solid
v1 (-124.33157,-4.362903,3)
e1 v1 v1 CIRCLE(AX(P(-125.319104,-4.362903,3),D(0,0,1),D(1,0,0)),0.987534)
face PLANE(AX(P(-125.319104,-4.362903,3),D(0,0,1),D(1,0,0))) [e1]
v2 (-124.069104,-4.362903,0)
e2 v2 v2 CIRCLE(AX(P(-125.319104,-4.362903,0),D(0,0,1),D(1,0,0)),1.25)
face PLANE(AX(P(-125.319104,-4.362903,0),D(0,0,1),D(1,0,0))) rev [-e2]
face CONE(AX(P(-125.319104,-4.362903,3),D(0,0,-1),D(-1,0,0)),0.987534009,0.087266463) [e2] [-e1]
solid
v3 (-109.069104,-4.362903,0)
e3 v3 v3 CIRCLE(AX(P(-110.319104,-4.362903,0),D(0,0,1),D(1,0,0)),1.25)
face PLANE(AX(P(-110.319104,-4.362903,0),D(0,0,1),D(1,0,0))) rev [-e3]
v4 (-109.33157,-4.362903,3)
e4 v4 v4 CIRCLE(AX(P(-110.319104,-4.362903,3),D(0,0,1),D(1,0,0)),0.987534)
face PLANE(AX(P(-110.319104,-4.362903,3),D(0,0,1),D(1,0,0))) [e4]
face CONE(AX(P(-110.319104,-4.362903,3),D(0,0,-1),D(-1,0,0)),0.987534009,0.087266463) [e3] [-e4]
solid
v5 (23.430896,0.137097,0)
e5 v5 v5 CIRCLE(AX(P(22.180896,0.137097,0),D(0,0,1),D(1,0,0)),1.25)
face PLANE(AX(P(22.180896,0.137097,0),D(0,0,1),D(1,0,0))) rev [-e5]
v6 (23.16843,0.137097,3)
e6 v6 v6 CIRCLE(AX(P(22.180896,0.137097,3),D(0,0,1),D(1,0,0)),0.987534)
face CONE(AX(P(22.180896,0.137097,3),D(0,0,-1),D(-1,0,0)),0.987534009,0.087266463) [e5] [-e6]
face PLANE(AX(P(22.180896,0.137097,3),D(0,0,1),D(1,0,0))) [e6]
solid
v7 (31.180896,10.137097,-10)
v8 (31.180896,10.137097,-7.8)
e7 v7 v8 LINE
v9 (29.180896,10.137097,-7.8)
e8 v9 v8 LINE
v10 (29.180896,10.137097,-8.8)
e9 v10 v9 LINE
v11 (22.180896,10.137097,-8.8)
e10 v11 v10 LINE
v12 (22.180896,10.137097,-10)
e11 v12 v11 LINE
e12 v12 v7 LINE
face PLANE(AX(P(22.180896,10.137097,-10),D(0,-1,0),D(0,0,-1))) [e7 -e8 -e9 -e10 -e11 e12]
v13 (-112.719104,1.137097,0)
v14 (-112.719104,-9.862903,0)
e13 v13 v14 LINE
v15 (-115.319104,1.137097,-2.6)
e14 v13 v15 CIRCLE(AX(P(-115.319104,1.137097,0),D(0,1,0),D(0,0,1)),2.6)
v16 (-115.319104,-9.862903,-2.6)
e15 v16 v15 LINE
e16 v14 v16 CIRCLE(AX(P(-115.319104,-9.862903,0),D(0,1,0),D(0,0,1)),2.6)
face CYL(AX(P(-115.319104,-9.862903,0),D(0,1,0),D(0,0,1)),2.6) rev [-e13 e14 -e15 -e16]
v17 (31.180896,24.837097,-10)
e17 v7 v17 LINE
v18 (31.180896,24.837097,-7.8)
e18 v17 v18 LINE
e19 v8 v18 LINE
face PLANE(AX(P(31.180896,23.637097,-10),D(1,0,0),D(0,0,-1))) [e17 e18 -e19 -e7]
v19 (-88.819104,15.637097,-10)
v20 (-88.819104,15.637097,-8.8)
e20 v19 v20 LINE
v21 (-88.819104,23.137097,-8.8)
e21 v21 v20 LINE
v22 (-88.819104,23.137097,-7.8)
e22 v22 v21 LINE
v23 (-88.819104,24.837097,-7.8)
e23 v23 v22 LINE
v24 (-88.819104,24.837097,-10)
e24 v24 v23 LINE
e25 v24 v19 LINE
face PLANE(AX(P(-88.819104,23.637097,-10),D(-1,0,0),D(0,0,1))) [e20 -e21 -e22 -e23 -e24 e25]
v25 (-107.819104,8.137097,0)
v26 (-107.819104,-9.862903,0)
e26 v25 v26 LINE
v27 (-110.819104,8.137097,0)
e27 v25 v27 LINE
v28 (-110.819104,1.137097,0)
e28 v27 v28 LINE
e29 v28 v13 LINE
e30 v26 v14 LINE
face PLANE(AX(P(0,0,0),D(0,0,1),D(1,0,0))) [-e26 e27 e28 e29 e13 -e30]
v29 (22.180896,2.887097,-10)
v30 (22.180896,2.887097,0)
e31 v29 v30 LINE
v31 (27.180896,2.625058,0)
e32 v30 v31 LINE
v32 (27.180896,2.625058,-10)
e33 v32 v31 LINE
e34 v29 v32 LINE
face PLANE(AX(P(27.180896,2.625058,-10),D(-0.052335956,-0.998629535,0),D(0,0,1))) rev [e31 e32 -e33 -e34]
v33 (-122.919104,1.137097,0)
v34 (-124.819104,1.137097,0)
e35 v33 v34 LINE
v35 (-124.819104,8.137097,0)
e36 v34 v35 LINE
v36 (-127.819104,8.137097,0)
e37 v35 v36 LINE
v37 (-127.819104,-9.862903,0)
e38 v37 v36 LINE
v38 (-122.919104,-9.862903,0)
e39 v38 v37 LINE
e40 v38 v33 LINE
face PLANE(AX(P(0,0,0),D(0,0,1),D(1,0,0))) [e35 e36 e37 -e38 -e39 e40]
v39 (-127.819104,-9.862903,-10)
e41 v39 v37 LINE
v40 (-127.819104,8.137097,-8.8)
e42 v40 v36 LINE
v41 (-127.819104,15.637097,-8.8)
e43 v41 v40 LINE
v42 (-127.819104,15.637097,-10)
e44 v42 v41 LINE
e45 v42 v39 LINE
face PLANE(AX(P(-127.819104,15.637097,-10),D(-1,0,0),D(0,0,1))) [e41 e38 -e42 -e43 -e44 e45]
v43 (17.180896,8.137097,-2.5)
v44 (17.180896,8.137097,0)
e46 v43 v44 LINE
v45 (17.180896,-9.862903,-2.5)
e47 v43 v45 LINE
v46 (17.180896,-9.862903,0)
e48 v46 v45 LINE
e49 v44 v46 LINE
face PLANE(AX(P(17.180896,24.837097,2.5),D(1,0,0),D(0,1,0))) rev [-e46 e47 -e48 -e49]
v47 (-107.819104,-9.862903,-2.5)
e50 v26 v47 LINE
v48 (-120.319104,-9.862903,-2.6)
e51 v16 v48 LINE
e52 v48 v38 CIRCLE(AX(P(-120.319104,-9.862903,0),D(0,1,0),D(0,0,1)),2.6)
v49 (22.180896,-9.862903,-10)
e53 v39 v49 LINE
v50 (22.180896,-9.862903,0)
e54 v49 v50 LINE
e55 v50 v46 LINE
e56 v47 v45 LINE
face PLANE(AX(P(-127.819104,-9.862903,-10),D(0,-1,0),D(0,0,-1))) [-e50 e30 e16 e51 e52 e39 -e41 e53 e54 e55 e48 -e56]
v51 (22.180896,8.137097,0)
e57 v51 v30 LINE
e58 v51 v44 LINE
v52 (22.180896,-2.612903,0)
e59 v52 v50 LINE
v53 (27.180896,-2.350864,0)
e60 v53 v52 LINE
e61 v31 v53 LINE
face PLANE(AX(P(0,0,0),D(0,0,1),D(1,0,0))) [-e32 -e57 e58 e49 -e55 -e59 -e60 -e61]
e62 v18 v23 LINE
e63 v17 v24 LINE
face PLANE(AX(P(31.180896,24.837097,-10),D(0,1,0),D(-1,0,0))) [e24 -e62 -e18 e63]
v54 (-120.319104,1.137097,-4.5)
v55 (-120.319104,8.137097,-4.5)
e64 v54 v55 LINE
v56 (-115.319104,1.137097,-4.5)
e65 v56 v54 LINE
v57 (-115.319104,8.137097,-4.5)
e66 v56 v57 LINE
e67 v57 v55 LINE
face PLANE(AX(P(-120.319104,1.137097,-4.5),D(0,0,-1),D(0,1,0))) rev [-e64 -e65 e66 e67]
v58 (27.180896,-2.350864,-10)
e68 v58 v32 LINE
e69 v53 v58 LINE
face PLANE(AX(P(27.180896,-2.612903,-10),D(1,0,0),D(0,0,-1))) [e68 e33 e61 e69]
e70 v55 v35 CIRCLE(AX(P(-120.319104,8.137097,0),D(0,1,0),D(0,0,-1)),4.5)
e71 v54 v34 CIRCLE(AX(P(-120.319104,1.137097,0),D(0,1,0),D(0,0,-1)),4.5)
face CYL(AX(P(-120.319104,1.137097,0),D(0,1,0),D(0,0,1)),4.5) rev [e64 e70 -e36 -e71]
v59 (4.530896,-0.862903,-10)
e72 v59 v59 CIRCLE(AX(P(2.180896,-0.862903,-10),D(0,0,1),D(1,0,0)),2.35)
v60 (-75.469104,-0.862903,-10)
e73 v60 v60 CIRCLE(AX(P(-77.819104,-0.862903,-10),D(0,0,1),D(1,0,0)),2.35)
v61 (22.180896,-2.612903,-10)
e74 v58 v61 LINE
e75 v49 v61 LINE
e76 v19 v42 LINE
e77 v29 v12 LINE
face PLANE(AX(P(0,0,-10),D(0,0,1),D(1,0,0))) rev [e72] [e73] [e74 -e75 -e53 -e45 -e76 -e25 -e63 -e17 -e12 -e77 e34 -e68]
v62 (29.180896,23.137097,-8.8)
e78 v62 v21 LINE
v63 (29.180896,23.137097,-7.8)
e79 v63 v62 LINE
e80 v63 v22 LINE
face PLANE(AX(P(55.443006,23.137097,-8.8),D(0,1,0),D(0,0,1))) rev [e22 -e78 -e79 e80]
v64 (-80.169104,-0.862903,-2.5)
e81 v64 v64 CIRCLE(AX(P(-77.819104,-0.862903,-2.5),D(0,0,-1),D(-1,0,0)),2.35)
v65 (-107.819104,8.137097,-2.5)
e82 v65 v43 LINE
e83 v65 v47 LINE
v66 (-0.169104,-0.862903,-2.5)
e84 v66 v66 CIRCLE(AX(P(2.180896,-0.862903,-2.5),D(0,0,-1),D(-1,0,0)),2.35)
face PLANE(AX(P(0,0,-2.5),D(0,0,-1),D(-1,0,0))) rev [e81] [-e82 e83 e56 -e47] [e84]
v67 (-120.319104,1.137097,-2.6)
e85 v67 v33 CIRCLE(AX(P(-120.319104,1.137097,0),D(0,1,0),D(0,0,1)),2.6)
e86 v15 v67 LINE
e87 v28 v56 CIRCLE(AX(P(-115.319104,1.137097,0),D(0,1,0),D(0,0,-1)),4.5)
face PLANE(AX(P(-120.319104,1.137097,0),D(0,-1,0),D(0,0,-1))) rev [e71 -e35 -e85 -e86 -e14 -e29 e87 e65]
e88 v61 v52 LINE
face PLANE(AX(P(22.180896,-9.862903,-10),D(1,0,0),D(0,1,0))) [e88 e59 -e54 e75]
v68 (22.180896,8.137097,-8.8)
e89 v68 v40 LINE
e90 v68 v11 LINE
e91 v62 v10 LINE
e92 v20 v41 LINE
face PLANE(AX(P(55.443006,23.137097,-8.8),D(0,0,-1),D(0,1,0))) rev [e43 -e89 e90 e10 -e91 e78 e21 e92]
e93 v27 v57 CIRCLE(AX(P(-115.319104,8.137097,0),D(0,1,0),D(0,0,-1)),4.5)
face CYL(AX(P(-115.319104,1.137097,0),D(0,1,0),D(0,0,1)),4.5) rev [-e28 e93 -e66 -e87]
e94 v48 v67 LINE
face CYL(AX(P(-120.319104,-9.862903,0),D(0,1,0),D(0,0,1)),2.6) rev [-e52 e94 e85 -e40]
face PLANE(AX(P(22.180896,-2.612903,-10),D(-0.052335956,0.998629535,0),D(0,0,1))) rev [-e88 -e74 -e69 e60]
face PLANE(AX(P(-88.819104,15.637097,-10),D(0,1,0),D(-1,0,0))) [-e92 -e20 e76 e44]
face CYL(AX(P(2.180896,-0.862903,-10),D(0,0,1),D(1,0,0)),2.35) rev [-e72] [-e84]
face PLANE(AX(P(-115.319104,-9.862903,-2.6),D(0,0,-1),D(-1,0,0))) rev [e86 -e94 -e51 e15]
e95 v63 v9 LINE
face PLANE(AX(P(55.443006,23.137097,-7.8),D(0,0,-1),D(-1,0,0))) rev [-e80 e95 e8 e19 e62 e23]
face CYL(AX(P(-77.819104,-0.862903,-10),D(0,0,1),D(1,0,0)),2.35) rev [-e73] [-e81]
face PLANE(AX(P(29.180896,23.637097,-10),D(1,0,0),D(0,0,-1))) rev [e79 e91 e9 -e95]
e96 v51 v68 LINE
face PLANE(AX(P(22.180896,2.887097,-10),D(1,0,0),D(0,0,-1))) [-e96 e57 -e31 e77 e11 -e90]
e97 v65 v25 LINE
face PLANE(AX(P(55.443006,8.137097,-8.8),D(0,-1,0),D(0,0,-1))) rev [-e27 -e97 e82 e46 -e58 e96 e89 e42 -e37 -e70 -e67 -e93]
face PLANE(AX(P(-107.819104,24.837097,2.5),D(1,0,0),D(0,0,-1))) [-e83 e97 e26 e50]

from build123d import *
from OCP.BRepFilletAPI import BRepFilletAPI_MakeChamfer

# Parameters (mm, degrees)
BOSS_EXTRUDE1_DEPTH      = 10
BOSS_EXTRUDE1_DEPTH_BACK = 10
CUT_EXTRUDE1_DEPTH       = 157
CUT_EXTRUDE4_DEPTH       = 2.5
CUT_EXTRUDE4_DEPTH_BACK  = 2.5
SKETCH8_W                = 125
SKETCH8_H                = 34.7
CUT_EXTRUDE5_DEPTH       = 131.593280003
CUT_EXTRUDE5_DEPTH_BACK  = 131.593280003
SKETCH9_R                = 2.35
CHAMFER2_SIZE            = 5
CHAMFER2_SIZE_2          = 0.262038896
CUT_EXTRUDE8_DEPTH       = 7
CUT_EXTRUDE9_DEPTH       = 131.381798599
SKETCH16_W               = 214.344642296
SKETCH16_H               = 84.645654919
CUT_EXTRUDE10_DEPTH      = 131.593280003
SKETCH17_W               = 2
SKETCH17_H               = 14.7
CUT_EXTRUDE11_DEPTH      = 7.8
SKETCH19_R               = 1.25
BOSS_EXTRUDE5_DEPTH      = 3
BOSS_EXTRUDE5_2_DEPTH    = 3
BOSS_EXTRUDE5_3_DEPTH    = 3
CHAMFER3_SIZE            = 3
CHAMFER3_SIZE_2          = 0.262465991
CHAMFER4_SIZE            = 3
CHAMFER4_SIZE_2          = 0.262465991
CHAMFER5_SIZE            = 3
CHAMFER5_SIZE_2          = 0.262465991


# Some blends are built 0.0001 mm under size
with BuildPart() as part:
    # Sketch1 → Boss-Extrude1 (new, two sides: drawn at the far end of the back side and taken through both)
    with BuildSketch(Plane.XY.offset(-BOSS_EXTRUDE1_DEPTH_BACK)):
        Polygon((-127.819104229, -9.862903226), (22.180895771, -9.862903226), (22.180895771, -2.612903226), (27.180895771, -2.612903226), (27.180895771, 2.887096774), (22.180895771, 2.887096774), (22.180895771, 10.137096774), (31.180895771, 10.137096774), (31.180895771, 23.637096774), (31.180895771, 24.837096774), (-88.819104229, 24.837096774), (-88.819104229, 23.637096774), (-88.819104229, 15.637096774), (-127.819104229, 15.637096774), align=None)
    extrude(amount=BOSS_EXTRUDE1_DEPTH + BOSS_EXTRUDE1_DEPTH_BACK)

    # Sketch2 → Cut-Extrude1 (cut)
    with BuildSketch(Plane.ZY.offset(127.819104229)):
        Polygon((-8.8, 23.137096774), (-8.8, 8.137096774), (8.8, 8.137096774), (8.8, 23.137096774), (7.8, 23.137096774), (7.8, 24.837096774), (-7.8, 24.837096774), (-7.8, 23.137096774), align=None)
    extrude(amount=-CUT_EXTRUDE1_DEPTH, mode=Mode.SUBTRACT)

    # Sketch8 → Cut-Extrude4 (cut, two sides: drawn at the far end of the back side and taken through both)
    with BuildSketch(Plane.XY.offset(-CUT_EXTRUDE4_DEPTH_BACK)):
        with Locations((-45.319104229, 7.487096774)):
            Rectangle(SKETCH8_W, SKETCH8_H)
    extrude(amount=CUT_EXTRUDE4_DEPTH + CUT_EXTRUDE4_DEPTH_BACK, mode=Mode.SUBTRACT)

    # Sketch9 → Cut-Extrude5 (cut, two sides: drawn at the far end of the back side and taken through both)
    with BuildSketch(Plane.XY.offset(-CUT_EXTRUDE5_DEPTH_BACK)):
        with Locations((-77.819104229, -0.862903226)):
            Circle(SKETCH9_R)
        with Locations((2.180895771, -0.862903226)):
            Circle(SKETCH9_R)
    extrude(amount=CUT_EXTRUDE5_DEPTH + CUT_EXTRUDE5_DEPTH_BACK, mode=Mode.SUBTRACT)

    # Chamfer2
    chamfer2_edges_1 = [part.edges().sort_by_distance(p)[0] for p in [
        (27.180895771, -2.612903226, 0),
    ]]
    chamfer2_side_1 = [part.faces().sort_by_distance(p)[0] for p in [
        (27.175654993, -2.612903226, 0),
    ]]
    chamfer2_edges_2 = [part.edges().sort_by_distance(p)[0] for p in [
        (27.180895771, 2.887096774, 0),
    ]]
    chamfer2_side_2 = [part.faces().sort_by_distance(p)[0] for p in [
        (27.180895771, 2.881855996, 0),
    ]]
    chamfer2 = BRepFilletAPI_MakeChamfer(part.part.solid().wrapped)
    for e in chamfer2_edges_1:
        chamfer2.Add(CHAMFER2_SIZE - 0.0001, CHAMFER2_SIZE_2 - 0.0001, e.wrapped, chamfer2_side_1[0].wrapped)
    for e in chamfer2_edges_2:
        chamfer2.Add(CHAMFER2_SIZE_2 - 0.0001, CHAMFER2_SIZE - 0.0001, e.wrapped, chamfer2_side_2[0].wrapped)
    add(Compound.cast(chamfer2.Shape()), mode=Mode.REPLACE)  # a hair under: the kernel refuses the full size

    # Sketch14 → Cut-Extrude8 (cut)
    with BuildSketch(Plane(origin=(0, 8.137096774, 0), x_dir=(1, 0, 0), z_dir=(0, 1, 0))):
        with BuildLine():
            Line((-120.319104229, 4.5), (-115.319104229, 4.5))
            ThreePointArc((-115.319104229, 4.5), (-110.819104229, 0), (-115.319104229, -4.5))
            Line((-115.319104229, -4.5), (-120.319104229, -4.5))
            ThreePointArc((-120.319104229, -4.5), (-124.819104229, 0), (-120.319104229, 4.5))
        make_face()
    extrude(amount=-CUT_EXTRUDE8_DEPTH, mode=Mode.SUBTRACT)

    # Sketch15 → Cut-Extrude9 (cut, through all)
    with BuildSketch(Plane(origin=(0, 1.137096774, 0), x_dir=(1, 0, 0), z_dir=(0, 1, 0))):
        with BuildLine():
            Line((-120.319104229, -2.6), (-115.319104229, -2.6))
            ThreePointArc((-115.319104229, -2.6), (-112.719104229, 0), (-115.319104229, 2.6))
            Line((-115.319104229, 2.6), (-120.319104229, 2.6))
            ThreePointArc((-120.319104229, 2.6), (-122.919104229, 0), (-120.319104229, -2.6))
        make_face()
    extrude(amount=-CUT_EXTRUDE9_DEPTH, mode=Mode.SUBTRACT)

    # Sketch16 → Cut-Extrude10 (cut, through all)
    with BuildSketch(Plane.XY):
        with Locations((-30.272765953, 16.776086779)):
            Rectangle(SKETCH16_W, SKETCH16_H)
    extrude(amount=CUT_EXTRUDE10_DEPTH, mode=Mode.SUBTRACT)

    # Sketch17 → Cut-Extrude11 (cut)
    with BuildSketch(Plane.XY):
        with Locations((30.180895771, 17.487096774)):
            Rectangle(SKETCH17_W, SKETCH17_H)
    extrude(amount=-CUT_EXTRUDE11_DEPTH, mode=Mode.SUBTRACT)


with BuildPart() as body_2:
    # Sketch19 → Boss-Extrude5 (new body)
    with BuildSketch(Plane.XY):
        with Locations((-125.319104229, -4.362903226)):
            Circle(SKETCH19_R)
    extrude(amount=BOSS_EXTRUDE5_DEPTH)

    # Chamfer5
    # the kernel refuses this chamfer: 3, 0.262465991 mm, written as the material it takes off along each edge
    with BuildSketch(Plane(origin=(-125.319104229, -4.362903226, 3), x_dir=(1, 0, 0), z_dir=(0, -1, 0))) as chamfer5_piece_1:
        Polygon((1.25, -CHAMFER5_SIZE), (1.25 - CHAMFER5_SIZE_2 * 0.999999998391, 0), (1.25, 0), align=None)
    revolve(axis=Axis((-125.319104229, -4.362903226, 3), (0, 0, 1)), mode=Mode.SUBTRACT)


with BuildPart() as body_3:
    # Sketch19 → Boss-Extrude5 2 (new body)
    with BuildSketch(Plane.XY):
        with Locations((-110.319104229, -4.362903226)):
            Circle(SKETCH19_R)
    extrude(amount=BOSS_EXTRUDE5_2_DEPTH)

    # Chamfer4
    # the kernel refuses this chamfer: 3, 0.262465991 mm, written as the material it takes off along each edge
    with BuildSketch(Plane(origin=(-110.319104229, -4.362903226, 3), x_dir=(1, 0, 0), z_dir=(0, -1, 0))) as chamfer4_piece_1:
        Polygon((1.25, -CHAMFER4_SIZE), (1.25 - CHAMFER4_SIZE_2 * 0.999999998391, 0), (1.25, 0), align=None)
    revolve(axis=Axis((-110.319104229, -4.362903226, 3), (0, 0, 1)), mode=Mode.SUBTRACT)


with BuildPart() as body_4:
    # Sketch19 → Boss-Extrude5 3 (new body)
    with BuildSketch(Plane.XY):
        with Locations((22.180895771, 0.137096774)):
            Circle(SKETCH19_R)
    extrude(amount=BOSS_EXTRUDE5_3_DEPTH)

    # Chamfer3
    # the kernel refuses this chamfer: 3, 0.262465991 mm, written as the material it takes off along each edge
    with BuildSketch(Plane(origin=(22.180895771, 0.137096774, 3), x_dir=(1, 0, 0), z_dir=(0, -1, 0))) as chamfer3_piece_1:
        Polygon((1.25, -CHAMFER3_SIZE), (1.25 - CHAMFER3_SIZE_2 * 0.999999998391, 0), (1.25, 0), align=None)
    revolve(axis=Axis((22.180895771, 0.137096774, 3), (0, 0, 1)), mode=Mode.SUBTRACT)


solid = Compound([part.part, body_2.part, body_3.part, body_4.part])
